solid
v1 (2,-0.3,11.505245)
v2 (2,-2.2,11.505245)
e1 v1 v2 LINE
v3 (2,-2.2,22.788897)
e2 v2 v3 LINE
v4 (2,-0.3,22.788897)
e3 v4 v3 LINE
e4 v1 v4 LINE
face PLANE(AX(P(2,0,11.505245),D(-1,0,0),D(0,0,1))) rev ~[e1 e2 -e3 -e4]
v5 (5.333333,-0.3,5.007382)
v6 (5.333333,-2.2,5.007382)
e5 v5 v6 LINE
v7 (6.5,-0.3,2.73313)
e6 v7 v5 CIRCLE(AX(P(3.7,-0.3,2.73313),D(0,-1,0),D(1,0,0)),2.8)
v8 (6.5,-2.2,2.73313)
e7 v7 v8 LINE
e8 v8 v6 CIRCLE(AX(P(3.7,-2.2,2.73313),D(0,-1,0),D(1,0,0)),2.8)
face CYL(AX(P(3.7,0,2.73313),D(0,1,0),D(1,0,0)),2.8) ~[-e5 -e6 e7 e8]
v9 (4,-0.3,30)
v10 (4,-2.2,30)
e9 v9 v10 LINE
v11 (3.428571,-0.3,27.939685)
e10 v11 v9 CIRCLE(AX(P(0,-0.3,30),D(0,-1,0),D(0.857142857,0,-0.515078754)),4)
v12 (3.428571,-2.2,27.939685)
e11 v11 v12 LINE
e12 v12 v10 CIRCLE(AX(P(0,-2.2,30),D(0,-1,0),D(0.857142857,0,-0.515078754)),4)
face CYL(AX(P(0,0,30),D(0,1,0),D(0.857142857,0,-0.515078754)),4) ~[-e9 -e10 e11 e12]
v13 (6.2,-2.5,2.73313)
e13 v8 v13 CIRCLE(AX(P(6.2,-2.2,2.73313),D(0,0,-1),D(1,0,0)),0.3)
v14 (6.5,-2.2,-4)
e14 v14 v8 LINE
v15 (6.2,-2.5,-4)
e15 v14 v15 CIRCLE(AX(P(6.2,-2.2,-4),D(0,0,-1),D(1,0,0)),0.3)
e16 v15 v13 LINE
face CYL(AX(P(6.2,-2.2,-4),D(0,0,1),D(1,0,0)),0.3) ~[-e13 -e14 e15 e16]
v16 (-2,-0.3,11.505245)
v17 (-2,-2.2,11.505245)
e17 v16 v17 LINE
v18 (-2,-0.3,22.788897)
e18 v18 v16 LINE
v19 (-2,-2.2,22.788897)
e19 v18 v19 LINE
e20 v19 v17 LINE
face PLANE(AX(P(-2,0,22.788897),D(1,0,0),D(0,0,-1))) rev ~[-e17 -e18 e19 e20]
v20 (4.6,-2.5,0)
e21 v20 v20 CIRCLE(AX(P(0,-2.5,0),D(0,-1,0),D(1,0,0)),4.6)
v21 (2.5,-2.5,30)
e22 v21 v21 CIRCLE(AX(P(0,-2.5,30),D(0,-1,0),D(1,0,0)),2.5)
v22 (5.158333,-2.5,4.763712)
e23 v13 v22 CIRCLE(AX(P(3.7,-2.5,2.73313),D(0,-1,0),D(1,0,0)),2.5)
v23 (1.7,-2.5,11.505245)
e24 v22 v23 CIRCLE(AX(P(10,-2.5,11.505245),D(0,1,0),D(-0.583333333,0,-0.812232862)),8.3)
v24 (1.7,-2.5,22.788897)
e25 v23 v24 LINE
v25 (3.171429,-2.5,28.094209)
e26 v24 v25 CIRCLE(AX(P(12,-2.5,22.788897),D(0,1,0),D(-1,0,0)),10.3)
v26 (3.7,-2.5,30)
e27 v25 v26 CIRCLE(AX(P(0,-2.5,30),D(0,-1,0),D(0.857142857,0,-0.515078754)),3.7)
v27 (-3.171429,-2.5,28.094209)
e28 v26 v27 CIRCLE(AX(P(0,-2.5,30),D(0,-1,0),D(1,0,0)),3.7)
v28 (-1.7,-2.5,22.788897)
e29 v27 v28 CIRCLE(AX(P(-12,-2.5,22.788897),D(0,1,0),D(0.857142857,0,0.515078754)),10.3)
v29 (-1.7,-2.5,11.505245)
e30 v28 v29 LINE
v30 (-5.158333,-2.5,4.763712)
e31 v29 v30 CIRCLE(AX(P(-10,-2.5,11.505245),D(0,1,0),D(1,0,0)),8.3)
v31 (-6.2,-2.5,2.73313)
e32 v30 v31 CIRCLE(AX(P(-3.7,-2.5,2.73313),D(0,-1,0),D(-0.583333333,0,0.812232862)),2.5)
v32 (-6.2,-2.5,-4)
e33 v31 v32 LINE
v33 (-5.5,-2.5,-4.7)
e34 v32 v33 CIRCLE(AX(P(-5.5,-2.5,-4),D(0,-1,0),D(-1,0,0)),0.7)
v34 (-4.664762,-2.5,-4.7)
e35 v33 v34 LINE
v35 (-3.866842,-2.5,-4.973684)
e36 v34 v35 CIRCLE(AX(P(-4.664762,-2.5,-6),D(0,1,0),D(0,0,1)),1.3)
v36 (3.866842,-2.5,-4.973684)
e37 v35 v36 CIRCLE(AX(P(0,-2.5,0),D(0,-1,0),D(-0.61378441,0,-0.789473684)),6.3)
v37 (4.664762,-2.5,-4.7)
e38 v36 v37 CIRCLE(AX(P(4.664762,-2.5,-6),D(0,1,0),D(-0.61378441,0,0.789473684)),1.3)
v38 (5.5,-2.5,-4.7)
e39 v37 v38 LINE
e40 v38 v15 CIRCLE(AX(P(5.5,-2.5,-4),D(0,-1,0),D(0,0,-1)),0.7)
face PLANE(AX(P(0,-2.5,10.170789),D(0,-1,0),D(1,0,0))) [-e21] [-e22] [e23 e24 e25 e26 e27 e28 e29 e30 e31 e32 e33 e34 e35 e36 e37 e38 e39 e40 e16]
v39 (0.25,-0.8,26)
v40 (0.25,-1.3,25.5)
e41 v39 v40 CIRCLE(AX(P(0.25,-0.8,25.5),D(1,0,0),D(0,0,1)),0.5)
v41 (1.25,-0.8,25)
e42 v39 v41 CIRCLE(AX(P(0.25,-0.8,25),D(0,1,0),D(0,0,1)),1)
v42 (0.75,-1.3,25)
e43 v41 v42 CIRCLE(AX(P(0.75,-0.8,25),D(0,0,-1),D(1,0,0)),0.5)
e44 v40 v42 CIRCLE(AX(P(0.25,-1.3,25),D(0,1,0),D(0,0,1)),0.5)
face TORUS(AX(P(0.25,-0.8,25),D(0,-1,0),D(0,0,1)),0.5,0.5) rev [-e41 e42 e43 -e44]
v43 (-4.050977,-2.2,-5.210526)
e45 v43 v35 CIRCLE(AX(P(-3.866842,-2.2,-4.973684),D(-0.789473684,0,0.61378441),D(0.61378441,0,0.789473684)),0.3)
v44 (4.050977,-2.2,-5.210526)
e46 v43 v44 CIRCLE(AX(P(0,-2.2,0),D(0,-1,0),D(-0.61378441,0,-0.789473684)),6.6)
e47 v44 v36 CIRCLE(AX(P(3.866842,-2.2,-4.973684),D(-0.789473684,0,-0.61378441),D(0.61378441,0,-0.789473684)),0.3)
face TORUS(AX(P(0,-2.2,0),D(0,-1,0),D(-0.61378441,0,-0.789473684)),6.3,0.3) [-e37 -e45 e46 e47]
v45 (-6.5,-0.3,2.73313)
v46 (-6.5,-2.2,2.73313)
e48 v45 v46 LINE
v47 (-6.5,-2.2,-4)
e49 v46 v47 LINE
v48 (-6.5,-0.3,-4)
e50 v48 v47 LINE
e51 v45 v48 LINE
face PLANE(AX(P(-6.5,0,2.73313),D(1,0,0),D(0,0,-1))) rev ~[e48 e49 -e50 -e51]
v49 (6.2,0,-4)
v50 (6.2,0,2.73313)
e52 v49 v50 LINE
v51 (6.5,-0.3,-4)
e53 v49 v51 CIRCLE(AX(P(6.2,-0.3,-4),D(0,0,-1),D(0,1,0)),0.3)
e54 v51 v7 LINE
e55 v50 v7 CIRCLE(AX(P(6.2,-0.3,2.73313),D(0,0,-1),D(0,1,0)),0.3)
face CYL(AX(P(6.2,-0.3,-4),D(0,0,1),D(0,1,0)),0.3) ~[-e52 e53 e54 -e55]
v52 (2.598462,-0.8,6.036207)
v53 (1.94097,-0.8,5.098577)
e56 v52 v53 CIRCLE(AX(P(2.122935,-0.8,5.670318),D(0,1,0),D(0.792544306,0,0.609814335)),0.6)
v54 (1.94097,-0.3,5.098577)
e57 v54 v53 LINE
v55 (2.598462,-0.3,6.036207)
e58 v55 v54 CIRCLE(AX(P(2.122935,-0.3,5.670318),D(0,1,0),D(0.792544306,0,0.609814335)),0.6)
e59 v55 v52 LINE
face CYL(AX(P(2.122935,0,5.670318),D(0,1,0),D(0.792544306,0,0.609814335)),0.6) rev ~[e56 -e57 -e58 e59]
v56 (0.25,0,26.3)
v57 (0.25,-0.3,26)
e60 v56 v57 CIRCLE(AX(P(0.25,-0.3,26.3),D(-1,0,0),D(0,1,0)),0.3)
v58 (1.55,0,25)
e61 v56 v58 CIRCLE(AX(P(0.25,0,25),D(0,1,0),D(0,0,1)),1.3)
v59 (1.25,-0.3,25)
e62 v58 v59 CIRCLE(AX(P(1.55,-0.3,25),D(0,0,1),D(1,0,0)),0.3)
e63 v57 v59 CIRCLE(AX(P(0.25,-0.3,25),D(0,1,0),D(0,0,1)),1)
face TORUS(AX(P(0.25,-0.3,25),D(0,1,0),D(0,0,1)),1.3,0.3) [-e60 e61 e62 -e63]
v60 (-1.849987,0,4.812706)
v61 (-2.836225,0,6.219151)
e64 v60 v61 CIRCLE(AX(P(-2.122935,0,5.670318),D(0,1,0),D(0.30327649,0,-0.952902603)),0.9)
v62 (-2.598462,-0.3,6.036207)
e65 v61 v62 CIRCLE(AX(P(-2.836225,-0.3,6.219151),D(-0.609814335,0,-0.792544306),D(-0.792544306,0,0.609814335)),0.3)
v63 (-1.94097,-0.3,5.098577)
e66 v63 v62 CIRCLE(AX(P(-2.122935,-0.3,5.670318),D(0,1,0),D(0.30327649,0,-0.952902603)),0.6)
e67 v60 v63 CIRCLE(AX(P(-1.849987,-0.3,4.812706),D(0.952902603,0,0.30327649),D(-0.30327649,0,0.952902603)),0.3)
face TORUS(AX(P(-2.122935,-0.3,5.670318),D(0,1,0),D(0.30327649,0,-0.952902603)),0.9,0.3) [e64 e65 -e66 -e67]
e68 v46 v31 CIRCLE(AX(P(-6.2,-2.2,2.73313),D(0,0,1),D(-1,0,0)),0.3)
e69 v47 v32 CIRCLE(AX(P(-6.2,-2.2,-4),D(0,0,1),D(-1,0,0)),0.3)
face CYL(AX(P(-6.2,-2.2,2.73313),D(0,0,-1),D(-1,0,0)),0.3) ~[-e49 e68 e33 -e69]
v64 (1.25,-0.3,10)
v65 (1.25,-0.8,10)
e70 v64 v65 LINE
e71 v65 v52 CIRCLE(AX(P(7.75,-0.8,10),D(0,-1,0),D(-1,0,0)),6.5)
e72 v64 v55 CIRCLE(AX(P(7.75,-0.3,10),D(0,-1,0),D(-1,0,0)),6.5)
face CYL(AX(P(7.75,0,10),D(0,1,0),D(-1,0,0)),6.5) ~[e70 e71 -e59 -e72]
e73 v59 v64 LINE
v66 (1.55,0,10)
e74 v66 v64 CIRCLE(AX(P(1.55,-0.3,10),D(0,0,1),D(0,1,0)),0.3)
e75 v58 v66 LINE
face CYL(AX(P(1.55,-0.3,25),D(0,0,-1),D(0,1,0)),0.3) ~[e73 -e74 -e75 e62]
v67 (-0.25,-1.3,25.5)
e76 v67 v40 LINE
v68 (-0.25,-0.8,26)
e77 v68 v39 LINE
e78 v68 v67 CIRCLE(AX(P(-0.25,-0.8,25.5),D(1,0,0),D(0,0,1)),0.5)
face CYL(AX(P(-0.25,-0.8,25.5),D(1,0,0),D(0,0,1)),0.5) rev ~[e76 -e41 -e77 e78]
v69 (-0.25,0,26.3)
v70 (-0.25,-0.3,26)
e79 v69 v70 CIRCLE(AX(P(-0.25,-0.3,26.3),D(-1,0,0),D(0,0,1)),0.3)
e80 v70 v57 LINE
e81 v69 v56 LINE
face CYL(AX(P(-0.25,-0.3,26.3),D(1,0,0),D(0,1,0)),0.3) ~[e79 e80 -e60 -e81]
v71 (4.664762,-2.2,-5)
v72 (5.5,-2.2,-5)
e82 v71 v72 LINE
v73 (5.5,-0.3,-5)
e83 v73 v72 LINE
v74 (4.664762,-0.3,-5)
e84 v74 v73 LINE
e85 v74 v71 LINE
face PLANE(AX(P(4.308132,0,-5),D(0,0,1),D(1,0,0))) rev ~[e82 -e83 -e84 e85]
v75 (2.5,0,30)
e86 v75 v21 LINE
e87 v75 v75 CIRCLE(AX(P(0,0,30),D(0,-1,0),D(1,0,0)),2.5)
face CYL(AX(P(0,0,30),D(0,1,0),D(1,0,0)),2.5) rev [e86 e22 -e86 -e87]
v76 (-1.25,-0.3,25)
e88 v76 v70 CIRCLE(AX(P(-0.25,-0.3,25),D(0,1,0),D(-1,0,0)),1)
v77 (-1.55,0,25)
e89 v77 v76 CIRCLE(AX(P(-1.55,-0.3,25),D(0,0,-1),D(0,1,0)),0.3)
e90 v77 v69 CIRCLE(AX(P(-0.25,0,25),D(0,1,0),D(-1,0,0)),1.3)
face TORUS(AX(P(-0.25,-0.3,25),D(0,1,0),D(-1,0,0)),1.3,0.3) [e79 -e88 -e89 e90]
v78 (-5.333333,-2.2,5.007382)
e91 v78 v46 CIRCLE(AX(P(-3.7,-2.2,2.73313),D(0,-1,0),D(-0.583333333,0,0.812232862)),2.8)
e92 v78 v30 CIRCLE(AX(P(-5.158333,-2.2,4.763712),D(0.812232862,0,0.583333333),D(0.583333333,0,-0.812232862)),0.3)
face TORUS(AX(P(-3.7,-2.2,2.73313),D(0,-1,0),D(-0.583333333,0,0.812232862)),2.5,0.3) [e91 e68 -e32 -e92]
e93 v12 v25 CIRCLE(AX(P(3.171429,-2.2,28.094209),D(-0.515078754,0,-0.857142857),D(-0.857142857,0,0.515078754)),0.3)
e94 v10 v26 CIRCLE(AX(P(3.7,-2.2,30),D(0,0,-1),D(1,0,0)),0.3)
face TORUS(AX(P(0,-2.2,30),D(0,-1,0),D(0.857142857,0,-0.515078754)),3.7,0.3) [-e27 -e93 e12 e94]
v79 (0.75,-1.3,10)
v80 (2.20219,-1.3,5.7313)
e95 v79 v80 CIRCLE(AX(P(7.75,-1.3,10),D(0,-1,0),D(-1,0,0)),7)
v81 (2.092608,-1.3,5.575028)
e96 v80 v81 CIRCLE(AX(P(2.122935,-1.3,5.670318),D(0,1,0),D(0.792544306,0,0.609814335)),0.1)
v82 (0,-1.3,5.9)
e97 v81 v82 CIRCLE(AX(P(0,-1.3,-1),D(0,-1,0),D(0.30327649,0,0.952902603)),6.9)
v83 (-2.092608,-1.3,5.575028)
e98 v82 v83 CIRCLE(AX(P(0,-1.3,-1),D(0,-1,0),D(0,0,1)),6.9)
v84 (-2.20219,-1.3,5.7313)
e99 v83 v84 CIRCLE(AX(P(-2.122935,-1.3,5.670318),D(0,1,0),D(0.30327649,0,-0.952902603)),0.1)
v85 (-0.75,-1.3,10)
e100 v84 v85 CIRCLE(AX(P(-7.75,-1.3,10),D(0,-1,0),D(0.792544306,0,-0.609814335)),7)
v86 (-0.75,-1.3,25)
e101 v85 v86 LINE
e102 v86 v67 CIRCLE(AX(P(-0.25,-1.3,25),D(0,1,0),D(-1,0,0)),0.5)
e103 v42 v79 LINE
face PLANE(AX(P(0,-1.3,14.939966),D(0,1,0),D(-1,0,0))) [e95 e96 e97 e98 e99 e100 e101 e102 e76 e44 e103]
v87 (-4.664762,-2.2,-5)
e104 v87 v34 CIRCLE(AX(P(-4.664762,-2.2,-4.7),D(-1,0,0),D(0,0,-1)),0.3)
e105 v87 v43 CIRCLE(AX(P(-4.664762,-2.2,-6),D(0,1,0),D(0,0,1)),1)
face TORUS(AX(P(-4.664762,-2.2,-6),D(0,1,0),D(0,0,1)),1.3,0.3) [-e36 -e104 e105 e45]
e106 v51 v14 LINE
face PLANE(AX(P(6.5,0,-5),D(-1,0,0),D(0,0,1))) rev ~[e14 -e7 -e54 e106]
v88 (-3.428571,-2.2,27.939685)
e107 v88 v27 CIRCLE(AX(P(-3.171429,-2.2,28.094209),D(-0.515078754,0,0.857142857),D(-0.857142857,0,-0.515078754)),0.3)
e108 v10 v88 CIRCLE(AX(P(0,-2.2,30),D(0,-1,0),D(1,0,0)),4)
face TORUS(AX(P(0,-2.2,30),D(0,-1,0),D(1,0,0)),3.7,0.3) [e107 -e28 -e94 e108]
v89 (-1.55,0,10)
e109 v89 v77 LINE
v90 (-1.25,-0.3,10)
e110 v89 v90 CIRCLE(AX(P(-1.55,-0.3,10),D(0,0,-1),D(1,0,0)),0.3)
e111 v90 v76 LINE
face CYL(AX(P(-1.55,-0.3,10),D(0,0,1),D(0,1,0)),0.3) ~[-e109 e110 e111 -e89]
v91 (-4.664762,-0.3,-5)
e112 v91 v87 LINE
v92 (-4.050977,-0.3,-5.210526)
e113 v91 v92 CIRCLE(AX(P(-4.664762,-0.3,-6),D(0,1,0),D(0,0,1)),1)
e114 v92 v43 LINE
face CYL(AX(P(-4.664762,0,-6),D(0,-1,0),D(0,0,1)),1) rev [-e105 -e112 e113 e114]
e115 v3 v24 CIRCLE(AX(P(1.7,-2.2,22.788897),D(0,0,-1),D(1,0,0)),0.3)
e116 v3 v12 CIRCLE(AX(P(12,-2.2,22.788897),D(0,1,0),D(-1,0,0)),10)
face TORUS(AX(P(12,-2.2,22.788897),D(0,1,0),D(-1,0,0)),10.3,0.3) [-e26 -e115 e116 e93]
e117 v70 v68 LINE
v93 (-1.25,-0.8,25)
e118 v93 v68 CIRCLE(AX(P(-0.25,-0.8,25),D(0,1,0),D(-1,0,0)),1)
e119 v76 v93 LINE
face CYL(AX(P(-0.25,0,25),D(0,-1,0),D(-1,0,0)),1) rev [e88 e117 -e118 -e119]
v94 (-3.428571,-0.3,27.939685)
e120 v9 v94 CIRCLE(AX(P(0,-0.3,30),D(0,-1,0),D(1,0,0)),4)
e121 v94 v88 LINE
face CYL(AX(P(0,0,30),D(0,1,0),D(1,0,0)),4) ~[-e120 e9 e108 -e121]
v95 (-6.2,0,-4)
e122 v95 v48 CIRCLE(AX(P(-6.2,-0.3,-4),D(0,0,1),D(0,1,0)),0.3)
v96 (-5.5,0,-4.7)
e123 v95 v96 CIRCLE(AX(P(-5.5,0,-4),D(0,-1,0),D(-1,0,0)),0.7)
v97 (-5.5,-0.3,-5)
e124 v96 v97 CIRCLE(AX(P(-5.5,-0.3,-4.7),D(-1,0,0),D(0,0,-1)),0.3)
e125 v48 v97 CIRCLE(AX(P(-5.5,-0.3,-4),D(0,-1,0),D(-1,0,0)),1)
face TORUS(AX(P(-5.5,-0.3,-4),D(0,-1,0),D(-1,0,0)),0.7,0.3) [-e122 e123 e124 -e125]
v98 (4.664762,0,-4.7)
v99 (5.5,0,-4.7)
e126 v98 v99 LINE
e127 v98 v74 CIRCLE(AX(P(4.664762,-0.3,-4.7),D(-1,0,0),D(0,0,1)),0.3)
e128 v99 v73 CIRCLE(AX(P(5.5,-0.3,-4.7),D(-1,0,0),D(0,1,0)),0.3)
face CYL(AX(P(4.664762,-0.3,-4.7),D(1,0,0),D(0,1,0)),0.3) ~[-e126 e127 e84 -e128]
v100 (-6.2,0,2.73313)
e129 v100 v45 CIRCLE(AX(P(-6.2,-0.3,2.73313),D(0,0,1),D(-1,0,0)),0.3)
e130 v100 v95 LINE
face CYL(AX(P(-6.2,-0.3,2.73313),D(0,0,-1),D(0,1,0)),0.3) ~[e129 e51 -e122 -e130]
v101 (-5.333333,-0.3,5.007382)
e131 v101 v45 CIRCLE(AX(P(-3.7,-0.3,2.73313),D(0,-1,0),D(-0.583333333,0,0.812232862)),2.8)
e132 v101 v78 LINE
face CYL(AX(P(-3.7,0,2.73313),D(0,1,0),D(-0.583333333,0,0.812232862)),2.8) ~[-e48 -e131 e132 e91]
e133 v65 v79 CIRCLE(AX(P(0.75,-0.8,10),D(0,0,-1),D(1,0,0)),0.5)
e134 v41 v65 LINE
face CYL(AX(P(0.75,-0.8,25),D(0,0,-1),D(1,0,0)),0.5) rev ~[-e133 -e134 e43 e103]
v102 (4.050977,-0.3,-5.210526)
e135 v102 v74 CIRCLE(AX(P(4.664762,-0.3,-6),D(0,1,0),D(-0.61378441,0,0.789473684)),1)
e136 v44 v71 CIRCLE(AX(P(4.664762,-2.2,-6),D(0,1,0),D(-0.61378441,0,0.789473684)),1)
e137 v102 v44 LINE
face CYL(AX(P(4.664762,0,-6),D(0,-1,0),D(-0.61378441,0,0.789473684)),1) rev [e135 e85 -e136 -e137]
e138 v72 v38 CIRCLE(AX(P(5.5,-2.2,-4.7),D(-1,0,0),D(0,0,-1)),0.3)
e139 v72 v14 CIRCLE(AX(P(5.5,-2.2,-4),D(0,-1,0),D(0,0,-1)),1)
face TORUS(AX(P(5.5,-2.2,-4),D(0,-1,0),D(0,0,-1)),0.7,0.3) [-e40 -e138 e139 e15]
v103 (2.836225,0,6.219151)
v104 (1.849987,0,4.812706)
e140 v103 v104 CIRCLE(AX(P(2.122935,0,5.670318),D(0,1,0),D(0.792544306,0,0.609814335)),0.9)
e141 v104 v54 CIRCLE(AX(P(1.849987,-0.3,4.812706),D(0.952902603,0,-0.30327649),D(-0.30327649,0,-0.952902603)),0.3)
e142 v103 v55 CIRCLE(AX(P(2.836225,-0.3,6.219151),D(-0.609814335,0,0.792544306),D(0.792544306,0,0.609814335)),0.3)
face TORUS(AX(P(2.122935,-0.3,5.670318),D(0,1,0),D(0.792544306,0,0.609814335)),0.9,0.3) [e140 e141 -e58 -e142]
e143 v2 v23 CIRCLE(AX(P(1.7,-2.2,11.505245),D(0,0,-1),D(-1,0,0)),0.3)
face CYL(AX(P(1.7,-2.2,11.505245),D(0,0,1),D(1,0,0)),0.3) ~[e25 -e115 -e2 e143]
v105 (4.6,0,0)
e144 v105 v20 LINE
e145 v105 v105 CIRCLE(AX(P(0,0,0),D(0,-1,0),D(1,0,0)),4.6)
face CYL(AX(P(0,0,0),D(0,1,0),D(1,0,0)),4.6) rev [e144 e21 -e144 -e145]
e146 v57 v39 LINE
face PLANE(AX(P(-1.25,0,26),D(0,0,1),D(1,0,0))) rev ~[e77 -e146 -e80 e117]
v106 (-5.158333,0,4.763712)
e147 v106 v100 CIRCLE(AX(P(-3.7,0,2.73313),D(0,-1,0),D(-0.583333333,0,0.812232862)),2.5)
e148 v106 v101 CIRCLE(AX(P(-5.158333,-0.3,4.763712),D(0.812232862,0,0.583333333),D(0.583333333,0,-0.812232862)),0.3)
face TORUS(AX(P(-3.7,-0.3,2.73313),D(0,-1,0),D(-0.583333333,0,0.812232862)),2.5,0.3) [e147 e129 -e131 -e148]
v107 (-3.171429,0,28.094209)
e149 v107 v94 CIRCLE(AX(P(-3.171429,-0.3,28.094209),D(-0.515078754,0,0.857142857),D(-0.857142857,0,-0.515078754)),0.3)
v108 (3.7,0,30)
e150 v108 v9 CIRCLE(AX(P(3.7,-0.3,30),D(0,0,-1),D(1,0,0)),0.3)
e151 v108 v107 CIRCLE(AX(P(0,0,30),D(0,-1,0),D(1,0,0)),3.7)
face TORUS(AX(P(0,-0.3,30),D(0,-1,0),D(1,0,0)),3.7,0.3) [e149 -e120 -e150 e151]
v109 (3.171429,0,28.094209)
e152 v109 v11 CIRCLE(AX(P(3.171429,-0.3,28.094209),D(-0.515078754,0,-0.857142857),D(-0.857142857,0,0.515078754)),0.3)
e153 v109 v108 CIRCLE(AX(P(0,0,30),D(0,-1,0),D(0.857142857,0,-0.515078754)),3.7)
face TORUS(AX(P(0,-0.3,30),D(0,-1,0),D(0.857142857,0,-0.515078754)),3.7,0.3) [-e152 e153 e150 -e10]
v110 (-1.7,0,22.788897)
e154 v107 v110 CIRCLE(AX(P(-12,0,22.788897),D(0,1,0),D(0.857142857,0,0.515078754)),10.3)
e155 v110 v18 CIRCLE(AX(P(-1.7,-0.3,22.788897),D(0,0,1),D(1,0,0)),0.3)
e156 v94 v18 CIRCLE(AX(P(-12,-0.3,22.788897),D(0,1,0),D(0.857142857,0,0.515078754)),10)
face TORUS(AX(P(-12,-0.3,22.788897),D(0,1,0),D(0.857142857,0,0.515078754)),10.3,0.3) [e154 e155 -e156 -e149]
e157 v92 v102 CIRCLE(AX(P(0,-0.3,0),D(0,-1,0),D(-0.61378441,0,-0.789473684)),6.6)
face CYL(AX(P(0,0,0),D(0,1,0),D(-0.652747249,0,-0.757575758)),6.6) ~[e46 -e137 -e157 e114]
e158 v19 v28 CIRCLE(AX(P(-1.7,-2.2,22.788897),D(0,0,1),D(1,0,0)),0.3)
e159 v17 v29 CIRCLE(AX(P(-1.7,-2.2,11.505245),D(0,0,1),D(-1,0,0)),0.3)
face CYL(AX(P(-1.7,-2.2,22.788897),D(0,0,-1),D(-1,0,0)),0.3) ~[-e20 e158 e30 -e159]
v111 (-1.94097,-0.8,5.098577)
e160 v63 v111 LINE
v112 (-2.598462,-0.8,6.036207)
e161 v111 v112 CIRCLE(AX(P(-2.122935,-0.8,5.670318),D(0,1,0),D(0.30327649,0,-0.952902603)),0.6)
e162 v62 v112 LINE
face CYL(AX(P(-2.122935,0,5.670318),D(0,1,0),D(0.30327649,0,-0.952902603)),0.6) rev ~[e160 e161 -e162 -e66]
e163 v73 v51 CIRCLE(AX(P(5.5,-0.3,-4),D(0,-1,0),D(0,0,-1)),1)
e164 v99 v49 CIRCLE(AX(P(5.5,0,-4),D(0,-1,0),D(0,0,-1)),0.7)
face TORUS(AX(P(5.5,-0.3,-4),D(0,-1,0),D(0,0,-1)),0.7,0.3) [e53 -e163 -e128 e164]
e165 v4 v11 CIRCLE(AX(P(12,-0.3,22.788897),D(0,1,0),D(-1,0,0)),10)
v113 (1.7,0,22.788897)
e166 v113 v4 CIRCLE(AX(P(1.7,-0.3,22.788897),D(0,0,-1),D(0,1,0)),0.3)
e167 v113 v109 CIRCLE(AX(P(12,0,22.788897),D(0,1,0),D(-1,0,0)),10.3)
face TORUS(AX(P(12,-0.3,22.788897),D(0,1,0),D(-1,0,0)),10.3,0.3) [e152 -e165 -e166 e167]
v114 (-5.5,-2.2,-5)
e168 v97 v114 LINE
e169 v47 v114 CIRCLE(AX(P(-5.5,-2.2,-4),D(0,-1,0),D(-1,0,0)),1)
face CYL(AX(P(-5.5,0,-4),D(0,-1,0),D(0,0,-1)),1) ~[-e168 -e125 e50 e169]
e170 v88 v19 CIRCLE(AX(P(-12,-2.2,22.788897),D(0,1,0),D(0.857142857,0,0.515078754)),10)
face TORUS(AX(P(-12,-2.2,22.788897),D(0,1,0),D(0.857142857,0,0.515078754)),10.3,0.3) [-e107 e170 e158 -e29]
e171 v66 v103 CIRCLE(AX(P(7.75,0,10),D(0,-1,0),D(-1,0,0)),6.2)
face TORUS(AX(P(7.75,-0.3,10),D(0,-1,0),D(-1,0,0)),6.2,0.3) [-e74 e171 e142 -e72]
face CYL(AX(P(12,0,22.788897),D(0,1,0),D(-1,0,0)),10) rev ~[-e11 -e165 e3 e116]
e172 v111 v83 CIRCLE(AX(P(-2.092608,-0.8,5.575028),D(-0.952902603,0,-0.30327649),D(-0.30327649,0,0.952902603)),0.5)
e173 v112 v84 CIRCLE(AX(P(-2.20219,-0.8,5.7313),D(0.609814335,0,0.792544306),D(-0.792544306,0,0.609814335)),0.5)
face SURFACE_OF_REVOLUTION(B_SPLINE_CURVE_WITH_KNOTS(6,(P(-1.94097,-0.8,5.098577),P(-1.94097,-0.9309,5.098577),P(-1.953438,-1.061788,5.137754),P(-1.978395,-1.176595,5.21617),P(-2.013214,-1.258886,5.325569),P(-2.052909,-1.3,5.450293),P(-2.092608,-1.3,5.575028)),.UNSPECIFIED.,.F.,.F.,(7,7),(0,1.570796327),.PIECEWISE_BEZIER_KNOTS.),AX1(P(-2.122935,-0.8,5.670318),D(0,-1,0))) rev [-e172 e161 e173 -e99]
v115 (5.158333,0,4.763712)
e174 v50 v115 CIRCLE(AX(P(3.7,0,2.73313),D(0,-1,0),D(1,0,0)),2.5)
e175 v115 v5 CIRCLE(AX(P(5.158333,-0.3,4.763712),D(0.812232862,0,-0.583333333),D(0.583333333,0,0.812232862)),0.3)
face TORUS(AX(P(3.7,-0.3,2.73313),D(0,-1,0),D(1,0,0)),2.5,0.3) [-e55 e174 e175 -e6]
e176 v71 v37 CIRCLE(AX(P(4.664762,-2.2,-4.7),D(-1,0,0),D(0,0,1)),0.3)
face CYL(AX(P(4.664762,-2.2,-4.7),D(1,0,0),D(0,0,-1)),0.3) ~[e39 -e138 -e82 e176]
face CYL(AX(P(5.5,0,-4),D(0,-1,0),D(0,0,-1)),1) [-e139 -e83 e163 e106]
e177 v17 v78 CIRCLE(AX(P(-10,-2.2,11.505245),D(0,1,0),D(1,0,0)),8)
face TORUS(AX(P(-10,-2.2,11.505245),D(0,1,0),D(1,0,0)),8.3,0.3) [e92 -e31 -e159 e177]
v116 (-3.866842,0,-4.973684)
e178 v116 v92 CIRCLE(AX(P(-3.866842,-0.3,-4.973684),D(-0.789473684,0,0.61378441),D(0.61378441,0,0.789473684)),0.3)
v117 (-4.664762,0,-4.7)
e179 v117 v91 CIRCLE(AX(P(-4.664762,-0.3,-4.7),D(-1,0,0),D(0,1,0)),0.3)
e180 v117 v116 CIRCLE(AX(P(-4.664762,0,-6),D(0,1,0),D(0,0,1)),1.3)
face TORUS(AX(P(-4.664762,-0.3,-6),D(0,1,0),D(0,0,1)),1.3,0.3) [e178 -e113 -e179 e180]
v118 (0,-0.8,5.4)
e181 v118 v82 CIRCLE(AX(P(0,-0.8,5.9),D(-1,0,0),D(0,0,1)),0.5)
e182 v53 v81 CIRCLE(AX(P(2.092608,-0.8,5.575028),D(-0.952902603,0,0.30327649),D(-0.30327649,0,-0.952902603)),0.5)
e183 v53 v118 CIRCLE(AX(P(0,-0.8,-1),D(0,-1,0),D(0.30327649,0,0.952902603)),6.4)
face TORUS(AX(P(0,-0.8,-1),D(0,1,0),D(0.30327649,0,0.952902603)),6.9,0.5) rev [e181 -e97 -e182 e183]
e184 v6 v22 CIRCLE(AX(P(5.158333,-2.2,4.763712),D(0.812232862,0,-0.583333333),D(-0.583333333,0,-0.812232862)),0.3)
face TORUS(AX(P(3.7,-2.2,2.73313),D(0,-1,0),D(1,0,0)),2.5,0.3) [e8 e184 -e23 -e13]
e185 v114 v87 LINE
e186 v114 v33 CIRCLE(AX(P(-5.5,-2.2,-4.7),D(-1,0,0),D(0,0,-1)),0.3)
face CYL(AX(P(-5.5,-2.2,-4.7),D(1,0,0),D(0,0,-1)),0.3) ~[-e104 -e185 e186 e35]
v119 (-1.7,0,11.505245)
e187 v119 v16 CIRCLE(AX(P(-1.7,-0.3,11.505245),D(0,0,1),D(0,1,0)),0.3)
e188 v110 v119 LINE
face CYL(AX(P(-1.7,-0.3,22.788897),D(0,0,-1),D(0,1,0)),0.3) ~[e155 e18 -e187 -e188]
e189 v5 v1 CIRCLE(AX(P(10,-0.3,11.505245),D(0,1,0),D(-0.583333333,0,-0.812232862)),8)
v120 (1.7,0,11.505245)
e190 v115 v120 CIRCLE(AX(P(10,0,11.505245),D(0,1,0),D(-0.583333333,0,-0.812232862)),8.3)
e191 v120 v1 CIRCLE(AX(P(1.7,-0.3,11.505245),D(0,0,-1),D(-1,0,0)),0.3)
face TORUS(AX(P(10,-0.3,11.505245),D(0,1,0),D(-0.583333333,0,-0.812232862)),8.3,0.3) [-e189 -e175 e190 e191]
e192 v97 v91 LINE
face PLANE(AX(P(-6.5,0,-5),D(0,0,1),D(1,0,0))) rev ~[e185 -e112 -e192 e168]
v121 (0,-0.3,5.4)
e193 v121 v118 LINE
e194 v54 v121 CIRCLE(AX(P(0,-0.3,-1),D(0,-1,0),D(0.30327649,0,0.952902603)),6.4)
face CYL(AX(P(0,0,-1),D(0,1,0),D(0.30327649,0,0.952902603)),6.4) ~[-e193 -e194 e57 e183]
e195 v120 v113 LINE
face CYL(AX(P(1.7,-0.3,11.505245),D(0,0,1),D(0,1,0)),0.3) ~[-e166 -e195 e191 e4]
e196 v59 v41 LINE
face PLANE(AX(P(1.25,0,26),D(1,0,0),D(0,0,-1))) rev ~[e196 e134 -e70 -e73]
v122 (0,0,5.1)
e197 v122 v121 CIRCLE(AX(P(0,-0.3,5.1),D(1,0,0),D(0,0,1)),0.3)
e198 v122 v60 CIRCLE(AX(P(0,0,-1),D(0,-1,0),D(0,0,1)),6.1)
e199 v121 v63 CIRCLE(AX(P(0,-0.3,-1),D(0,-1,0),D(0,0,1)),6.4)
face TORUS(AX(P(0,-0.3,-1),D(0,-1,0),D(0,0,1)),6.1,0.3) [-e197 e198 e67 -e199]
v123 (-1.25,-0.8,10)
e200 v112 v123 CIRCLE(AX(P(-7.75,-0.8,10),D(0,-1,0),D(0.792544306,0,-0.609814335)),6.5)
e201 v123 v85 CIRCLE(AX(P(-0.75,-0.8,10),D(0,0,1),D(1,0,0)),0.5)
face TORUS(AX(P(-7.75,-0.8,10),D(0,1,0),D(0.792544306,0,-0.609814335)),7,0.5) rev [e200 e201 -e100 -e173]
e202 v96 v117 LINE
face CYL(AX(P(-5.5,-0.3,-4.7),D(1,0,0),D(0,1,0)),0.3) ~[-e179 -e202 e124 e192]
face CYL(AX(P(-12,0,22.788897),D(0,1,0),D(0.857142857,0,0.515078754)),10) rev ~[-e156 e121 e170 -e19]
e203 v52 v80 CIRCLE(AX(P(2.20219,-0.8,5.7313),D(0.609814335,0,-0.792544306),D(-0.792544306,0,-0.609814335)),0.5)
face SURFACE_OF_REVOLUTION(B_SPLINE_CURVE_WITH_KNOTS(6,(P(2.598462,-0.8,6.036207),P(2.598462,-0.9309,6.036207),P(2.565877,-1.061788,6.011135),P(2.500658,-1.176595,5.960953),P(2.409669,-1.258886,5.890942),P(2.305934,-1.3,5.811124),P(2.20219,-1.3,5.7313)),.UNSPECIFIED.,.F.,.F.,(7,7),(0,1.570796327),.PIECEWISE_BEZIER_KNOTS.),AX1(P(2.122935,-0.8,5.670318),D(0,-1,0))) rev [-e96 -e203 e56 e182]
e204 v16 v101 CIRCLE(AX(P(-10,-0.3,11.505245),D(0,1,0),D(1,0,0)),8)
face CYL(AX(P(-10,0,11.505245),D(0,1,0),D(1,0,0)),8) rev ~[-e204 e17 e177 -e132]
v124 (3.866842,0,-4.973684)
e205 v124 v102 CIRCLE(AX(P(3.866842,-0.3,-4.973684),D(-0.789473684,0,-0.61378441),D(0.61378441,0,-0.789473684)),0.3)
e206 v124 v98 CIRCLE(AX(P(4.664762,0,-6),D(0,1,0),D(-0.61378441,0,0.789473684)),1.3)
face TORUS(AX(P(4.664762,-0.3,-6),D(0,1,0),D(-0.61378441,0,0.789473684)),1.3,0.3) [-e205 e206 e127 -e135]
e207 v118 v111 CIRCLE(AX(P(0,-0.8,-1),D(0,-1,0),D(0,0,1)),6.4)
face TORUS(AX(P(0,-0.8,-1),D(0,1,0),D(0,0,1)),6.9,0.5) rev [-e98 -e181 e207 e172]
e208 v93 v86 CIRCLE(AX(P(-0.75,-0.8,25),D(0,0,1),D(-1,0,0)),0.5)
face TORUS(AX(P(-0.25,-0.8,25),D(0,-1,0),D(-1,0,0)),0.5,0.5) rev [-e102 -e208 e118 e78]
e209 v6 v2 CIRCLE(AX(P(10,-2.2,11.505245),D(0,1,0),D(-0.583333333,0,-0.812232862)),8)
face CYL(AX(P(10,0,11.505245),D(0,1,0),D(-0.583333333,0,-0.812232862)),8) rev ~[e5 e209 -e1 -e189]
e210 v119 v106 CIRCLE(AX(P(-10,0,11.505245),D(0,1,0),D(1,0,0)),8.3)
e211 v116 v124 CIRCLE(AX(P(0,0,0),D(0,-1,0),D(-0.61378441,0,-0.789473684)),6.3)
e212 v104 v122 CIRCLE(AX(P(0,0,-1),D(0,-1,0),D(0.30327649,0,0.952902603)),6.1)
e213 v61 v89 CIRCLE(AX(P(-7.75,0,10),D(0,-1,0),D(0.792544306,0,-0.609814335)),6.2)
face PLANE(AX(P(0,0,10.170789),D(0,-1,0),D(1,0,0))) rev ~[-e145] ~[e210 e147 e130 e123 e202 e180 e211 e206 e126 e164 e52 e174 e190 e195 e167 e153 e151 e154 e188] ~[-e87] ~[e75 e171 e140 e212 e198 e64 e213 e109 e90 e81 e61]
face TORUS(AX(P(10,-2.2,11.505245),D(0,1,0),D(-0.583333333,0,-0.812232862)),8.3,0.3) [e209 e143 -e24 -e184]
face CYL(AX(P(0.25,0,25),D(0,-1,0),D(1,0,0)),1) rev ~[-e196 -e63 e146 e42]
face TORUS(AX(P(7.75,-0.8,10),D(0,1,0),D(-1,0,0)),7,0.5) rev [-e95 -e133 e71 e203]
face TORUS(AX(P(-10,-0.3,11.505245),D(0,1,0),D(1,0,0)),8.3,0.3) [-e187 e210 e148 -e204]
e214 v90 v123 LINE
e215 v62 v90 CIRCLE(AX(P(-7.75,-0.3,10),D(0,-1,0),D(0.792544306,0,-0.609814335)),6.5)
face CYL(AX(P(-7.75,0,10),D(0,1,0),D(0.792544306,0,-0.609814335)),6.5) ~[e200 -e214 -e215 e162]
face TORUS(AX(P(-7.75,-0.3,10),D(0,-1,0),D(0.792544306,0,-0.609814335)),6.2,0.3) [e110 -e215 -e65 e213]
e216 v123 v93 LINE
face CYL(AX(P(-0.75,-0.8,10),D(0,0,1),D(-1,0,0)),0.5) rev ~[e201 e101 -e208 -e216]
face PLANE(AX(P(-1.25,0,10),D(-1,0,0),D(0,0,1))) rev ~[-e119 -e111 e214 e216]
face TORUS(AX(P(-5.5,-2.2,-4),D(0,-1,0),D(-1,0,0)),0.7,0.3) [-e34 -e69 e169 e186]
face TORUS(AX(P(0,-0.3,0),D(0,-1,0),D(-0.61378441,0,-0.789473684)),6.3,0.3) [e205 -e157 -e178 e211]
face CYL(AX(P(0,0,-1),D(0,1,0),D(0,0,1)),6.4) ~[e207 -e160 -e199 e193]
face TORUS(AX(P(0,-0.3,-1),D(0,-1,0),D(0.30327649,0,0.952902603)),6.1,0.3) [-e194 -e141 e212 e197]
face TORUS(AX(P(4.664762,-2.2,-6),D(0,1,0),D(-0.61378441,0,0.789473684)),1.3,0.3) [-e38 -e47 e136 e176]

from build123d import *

# Parameters (mm, degrees)
F0_R     = 4.6
F0_R_2   = 2.5
F1_DEPTH = 2.5
F3_DEPTH = 1.3
F4_R     = 1
F6_R     = 0.5
F7_R     = 0.3


# Not quite as in the source:
# - two fillets or chamfers of one size are made in one step


with BuildPart() as f1:
    # F0 (on Front) → F1 (new body)
    with BuildSketch(Plane.XZ):
        with BuildLine():
            Line((-6.5, -5), (-4.3081318457, -5))
            ThreePointArc((-4.3081318457, -5), (0, -6.6), (4.3081318457, -5))
            Line((4.3081318457, -5), (6.5, -5))
            Line((6.5, -5), (6.5, 2.7331300737))
            ThreePointArc((6.5, 2.7331300737), (6.1913182588, 4.0111493746), (5.3333333333, 5.0073820875))
            ThreePointArc((5.3333333333, 5.0073820875), (2.881947832, 7.8537612674), (2, 11.5052449841))
            Line((2, 11.5052449841), (2, 22.7888974491))
            ThreePointArc((2, 22.7888974491), (2.3637588834, 25.4615098682), (3.4285714286, 27.9396849854))
            ThreePointArc((3.4285714286, 27.9396849854), (0, 26), (-3.4285714286, 27.9396849854))
            ThreePointArc((-3.4285714286, 27.9396849854), (-2.3637588834, 25.4615098682), (-2, 22.7888974491))
            Line((-2, 22.7888974491), (-2, 11.5052449841))
            ThreePointArc((-2, 11.5052449841), (-2.881947832, 7.8537612674), (-5.3333333333, 5.0073820875))
            ThreePointArc((-5.3333333333, 5.0073820875), (-6.1913182588, 4.0111493746), (-6.5, 2.7331300737))
            Line((-6.5, 2.7331300737), (-6.5, -5))
        make_face()
        Circle(F0_R, mode=Mode.SUBTRACT)
        with BuildLine():
            ThreePointArc((4, 30), (-1.0690449676, 33.8544964466), (-3.4285714286, 27.9396849854))
            ThreePointArc((-3.4285714286, 27.9396849854), (0, 26), (3.4285714286, 27.9396849854))
            ThreePointArc((3.4285714286, 27.9396849854), (3.8544964466, 28.9309550324), (4, 30))
        make_face()
        with Locations((0, 30)):
            Circle(F0_R_2, mode=Mode.SUBTRACT)
    extrude(amount=F1_DEPTH)

    # F2 (on face) → F3 (cut)
    with BuildSketch(Plane(origin=(0, 0, 0), x_dir=(-1, 0, 0), z_dir=(0, 1, 0))):
        with BuildLine():
            Line((1.25, 26), (-1.25, 26))
            Line((-1.25, 26), (-1.25, 10))
            ThreePointArc((-1.25, 10), (-1.5963426761, 7.9065574908), (-2.5984620121, 6.0362068218))
            ThreePointArc((-2.5984620121, 6.0362068218), (-2.614191014, 5.3258360734), (-1.9409695348, 5.098576659))
            ThreePointArc((-1.9409695348, 5.098576659), (-0.9821174529, 5.3241952301), (0, 5.4))
            ThreePointArc((0, 5.4), (0.9821174529, 5.3241952301), (1.9409695348, 5.098576659))
            ThreePointArc((1.9409695348, 5.098576659), (2.614191014, 5.3258360734), (2.5984620121, 6.0362068218))
            ThreePointArc((2.5984620121, 6.0362068218), (1.5963426761, 7.9065574908), (1.25, 10))
            Line((1.25, 10), (1.25, 26))
        make_face()
    extrude(amount=-F3_DEPTH, mode=Mode.SUBTRACT)

    # F4
    f4_edges = [f1.edges().sort_by_distance(p)[0] for p in [
        (1.25, -0.65, 26),
        (-1.25, -0.65, 26),
        (-6.5, -1.25, -5),
        (-4.308132, -1.25, -5),
        (6.5, -1.25, -5),
        (4.308132, -1.25, -5),
    ]]
    fillet(f4_edges, radius=F4_R)

    # F6
    f6_edges = [f1.edges().sort_by_distance(p)[0] for p in [
        (0, -1.3, 5.4),
        (1.25, -1.3, 17.5),
        (0.957107, -1.3, 25.707107),
        (1.596343, -1.3, 7.906557),
        (0, -1.3, 26),
        (2.614191, -1.3, 5.325836),
        (-0.957107, -1.3, 25.707107),
        (-1.25, -1.3, 17.5),
        (-2.614191, -1.3, 5.325836),
        (-1.596343, -1.3, 7.906557),
    ]]
    fillet(f6_edges, radius=F6_R)

    # F7
    f7_edges = [f1.edges().sort_by_distance(p)[0] for p in [
        (2.614191, 0, 5.325836),
        (6.5, 0, -0.633435),
        (2.881948, -2.5, 7.853761),
        (1.25, 0, 17.5),
        (0.957107, 0, 25.707107),
        (-6.5, 0, -0.633435),
        (-6.207107, 0, -4.707107),
        (-6.191318, 0, 4.011149),
        (-5.082381, 0, -5),
        (-2.881948, 0, 7.853761),
        (-4.340319, 0, -5.054095),
        (-2, 0, 17.147071),
        (0, 0, -6.6),
        (-2.363759, 0, 25.46151),
        (4.340319, 0, -5.054095),
        (0, 0, 34),
        (5.082381, 0, -5),
        (2.363759, 0, 25.46151),
        (6.207107, 0, -4.707107),
        (2, 0, 17.147071),
        (2.881948, 0, 7.853761),
        (6.191318, 0, 4.011149),
        (1.596343, 0, 7.906557),
        (0, 0, 26),
        (-0.957107, 0, 25.707107),
        (0, 0, 5.4),
        (-1.25, 0, 17.5),
        (-2.614191, 0, 5.325836),
        (-1.596343, 0, 7.906557),
        (-6.5, -2.5, -0.633435),
        (-6.207107, -2.5, -4.707107),
        (-6.191318, -2.5, 4.011149),
        (-5.082381, -2.5, -5),
        (-2.881948, -2.5, 7.853761),
        (-4.340319, -2.5, -5.054095),
        (-2, -2.5, 17.147071),
        (0, -2.5, -6.6),
        (-2.363759, -2.5, 25.46151),
        (4.340319, -2.5, -5.054095),
        (0, -2.5, 34),
        (5.082381, -2.5, -5),
        (2.363759, -2.5, 25.46151),
        (6.207107, -2.5, -4.707107),
        (2, -2.5, 17.147071),
        (6.5, -2.5, -0.633435),
        (6.191318, -2.5, 4.011149),
    ]]
    fillet(f7_edges, radius=F7_R)


solid = f1.part
